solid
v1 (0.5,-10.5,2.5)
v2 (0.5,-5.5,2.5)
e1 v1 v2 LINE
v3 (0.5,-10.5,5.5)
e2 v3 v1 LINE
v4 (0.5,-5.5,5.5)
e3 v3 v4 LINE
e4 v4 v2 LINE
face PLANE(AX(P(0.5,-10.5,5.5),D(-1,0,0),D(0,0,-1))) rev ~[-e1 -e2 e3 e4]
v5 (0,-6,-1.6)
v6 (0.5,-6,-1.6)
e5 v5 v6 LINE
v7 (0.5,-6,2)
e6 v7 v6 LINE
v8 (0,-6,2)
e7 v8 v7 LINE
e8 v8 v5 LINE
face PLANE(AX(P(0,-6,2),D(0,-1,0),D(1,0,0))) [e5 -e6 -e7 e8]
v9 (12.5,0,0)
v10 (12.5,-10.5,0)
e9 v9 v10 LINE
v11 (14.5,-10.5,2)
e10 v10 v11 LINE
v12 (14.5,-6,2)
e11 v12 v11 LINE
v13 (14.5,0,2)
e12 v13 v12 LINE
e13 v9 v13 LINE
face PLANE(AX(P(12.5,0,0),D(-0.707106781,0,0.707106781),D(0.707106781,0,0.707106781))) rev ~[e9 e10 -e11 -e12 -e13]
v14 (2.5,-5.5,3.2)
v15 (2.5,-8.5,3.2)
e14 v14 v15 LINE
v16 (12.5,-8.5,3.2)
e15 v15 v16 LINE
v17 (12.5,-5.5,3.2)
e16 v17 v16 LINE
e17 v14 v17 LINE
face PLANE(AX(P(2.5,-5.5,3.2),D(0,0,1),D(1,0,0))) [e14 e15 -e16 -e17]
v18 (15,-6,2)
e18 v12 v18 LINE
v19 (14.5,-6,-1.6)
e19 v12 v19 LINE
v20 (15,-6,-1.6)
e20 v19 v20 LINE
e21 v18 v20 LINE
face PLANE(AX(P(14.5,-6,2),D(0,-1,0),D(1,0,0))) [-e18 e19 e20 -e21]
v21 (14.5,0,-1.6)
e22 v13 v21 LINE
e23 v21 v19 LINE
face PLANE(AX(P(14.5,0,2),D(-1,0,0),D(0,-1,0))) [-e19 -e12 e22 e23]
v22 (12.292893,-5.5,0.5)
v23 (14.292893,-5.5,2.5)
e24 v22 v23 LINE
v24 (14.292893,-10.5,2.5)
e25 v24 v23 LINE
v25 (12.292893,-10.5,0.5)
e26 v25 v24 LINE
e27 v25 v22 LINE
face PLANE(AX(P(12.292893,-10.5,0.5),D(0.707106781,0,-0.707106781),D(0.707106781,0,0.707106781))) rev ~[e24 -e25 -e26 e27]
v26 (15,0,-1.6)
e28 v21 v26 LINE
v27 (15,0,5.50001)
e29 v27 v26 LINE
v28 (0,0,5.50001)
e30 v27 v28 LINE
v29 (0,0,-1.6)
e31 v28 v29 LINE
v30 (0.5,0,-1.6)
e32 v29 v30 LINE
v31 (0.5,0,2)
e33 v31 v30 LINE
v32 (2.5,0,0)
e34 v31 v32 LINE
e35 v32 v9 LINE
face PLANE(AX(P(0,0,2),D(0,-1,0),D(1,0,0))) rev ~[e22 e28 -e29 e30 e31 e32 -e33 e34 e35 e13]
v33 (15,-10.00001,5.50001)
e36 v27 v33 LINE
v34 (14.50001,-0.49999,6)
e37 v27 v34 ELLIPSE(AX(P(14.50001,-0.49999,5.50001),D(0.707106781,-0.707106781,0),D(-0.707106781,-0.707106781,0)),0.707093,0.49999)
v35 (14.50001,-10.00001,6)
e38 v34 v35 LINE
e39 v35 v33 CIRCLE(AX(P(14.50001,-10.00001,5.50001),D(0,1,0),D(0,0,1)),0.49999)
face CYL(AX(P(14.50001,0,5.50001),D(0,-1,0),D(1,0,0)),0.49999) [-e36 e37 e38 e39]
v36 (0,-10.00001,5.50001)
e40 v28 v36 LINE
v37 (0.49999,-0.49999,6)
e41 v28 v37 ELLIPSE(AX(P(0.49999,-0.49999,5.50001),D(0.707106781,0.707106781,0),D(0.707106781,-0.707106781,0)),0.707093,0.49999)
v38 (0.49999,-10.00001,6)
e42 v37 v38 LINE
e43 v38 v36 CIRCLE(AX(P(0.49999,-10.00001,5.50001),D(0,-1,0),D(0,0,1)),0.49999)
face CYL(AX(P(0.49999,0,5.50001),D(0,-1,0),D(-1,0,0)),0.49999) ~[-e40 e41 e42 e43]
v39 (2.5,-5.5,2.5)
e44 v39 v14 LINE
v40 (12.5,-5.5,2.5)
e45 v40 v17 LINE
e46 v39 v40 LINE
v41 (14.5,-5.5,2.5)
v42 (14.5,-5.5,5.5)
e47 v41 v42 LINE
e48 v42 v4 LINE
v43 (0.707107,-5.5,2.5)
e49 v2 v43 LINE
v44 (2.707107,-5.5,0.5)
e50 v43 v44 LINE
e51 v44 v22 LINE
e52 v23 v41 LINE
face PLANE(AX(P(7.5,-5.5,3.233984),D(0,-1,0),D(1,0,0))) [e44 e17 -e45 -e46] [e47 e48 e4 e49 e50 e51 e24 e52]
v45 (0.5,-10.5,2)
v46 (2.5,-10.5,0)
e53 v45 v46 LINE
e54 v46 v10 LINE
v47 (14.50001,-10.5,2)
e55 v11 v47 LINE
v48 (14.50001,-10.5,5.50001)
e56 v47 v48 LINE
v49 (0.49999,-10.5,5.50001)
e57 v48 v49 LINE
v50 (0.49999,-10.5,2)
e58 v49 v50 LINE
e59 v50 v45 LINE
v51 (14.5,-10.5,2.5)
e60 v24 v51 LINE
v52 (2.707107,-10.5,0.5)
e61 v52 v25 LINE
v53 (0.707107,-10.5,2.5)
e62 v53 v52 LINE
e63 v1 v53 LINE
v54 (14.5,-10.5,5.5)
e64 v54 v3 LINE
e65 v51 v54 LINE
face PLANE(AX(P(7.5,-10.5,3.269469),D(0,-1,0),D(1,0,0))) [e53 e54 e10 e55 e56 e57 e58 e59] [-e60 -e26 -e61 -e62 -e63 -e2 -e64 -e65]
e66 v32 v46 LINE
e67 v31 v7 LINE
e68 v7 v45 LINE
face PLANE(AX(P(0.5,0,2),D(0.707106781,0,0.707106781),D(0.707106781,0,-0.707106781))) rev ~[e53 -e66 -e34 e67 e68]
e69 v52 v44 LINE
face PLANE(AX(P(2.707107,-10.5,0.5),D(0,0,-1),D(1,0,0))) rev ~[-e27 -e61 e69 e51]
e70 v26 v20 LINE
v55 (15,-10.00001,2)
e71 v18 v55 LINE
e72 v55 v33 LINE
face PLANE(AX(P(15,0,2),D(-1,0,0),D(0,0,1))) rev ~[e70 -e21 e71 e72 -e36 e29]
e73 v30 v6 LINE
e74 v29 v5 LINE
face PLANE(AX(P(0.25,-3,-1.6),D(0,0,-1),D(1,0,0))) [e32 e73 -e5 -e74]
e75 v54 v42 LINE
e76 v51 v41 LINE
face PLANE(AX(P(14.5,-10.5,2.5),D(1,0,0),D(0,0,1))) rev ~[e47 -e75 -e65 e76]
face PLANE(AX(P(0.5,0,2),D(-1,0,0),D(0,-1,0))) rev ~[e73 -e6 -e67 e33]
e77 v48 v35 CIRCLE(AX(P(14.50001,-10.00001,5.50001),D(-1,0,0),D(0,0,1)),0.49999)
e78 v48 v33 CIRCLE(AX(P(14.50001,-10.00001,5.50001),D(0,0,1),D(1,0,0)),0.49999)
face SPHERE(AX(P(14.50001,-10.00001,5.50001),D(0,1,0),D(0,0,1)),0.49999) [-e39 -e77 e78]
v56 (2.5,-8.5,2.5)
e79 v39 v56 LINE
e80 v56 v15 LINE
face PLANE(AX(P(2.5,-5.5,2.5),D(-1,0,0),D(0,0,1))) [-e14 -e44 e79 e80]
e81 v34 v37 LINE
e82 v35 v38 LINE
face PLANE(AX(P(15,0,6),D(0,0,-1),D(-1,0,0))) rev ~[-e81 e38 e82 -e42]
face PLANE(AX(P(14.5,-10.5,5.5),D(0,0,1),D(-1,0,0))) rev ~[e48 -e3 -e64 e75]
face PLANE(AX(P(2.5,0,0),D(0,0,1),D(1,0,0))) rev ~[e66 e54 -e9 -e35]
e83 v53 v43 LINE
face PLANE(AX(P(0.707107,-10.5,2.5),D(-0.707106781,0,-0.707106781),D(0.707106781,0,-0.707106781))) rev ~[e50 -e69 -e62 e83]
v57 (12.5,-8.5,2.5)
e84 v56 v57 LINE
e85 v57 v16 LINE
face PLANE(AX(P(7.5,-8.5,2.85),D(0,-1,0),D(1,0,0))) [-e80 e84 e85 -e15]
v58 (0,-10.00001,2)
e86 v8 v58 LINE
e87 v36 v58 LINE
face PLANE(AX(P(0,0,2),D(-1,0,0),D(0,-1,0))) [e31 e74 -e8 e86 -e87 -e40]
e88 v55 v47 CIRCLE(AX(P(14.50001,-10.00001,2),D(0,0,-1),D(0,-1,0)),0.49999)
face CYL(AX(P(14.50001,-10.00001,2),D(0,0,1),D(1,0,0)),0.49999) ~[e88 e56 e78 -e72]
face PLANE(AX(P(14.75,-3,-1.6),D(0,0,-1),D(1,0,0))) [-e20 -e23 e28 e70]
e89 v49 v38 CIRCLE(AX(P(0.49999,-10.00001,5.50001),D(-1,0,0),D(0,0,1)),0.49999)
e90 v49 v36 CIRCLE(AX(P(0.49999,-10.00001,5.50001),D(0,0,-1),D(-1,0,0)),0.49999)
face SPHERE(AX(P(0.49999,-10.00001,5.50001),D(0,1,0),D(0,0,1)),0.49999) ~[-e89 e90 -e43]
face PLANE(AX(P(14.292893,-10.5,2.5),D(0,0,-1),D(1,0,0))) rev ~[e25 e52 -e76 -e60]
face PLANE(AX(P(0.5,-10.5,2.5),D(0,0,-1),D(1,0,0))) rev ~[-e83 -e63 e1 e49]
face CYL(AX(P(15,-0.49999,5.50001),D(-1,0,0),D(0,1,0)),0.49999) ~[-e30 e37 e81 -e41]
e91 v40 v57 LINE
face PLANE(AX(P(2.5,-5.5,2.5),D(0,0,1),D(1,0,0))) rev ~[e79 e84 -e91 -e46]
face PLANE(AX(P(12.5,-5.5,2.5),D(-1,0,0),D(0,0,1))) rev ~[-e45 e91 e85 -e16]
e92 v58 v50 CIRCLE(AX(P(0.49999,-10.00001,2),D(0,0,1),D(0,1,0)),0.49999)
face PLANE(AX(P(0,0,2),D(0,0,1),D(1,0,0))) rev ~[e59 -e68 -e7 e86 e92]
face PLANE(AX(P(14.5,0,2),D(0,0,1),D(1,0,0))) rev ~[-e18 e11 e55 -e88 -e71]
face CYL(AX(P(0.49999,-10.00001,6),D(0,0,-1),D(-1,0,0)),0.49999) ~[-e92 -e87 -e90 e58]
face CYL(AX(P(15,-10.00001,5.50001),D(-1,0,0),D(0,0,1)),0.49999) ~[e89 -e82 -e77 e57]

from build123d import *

# Parameters (mm, degrees)
F1_DEPTH = 10.5
F3_DEPTH = 5
F4_W     = 10
F4_H     = 0.7
F5_DEPTH = 3
F6_W     = 0.5
F6_H     = 6
F7_DEPTH = 3.6
F8_R     = 0.49999


# Not quite as in the source:
# - a fillet or chamfer is up to 0.001 mm smaller than in the source, because OpenCascade refuses the exact size


with BuildPart() as f1:
    # F0 (on Front) → F1 (new body)
    with BuildSketch(Plane.XZ):
        Polygon((15, 6), (0, 6), (0, 2), (0.5, 2), (2.5, 0), (12.5, 0), (14.5, 2), (15, 2), align=None)
    extrude(amount=F1_DEPTH)

    # F2 (on face) → F3 (cut)
    with BuildSketch(Plane.XZ.offset(10.5)):
        Polygon((14.5, 5.5), (0.5, 5.5), (0.5, 2.5), (0.7071067812, 2.5), (2.7071067812, 0.5), (12.2928932188, 0.5), (14.2928932188, 2.5), (14.5, 2.5), align=None)
    extrude(amount=-F3_DEPTH, mode=Mode.SUBTRACT)

    # F4 (on face) → F5 (join)
    with BuildSketch(Plane.XZ.offset(5.5)):
        with Locations((7.5, 2.85)):
            Rectangle(F4_W, F4_H)
    extrude(amount=F5_DEPTH)

    # F6 (on face) → F7 (join)
    with BuildSketch(Plane(origin=(0, 0, 2), x_dir=(1, 0, 0), z_dir=(0, 0, -1))):
        with Locations((0.25, 3)):
            Rectangle(F6_W, F6_H)
        with Locations((14.75, 3)):
            Rectangle(F6_W, F6_H)
    extrude(amount=F7_DEPTH)

    # F8 (radius 0.5 in the source; OpenCascade refuses exactly that, so slightly less here)
    f8_edges = [f1.edges().sort_by_distance(p)[0] for p in [
        (0, -5.25, 6),
        (7.5, 0, 6),
        (15, -5.25, 6),
        (7.5, -10.5, 6),
        (0, -10.5, 4),
        (15, -10.5, 4),
    ]]
    fillet(f8_edges, radius=F8_R)


solid = f1.part
